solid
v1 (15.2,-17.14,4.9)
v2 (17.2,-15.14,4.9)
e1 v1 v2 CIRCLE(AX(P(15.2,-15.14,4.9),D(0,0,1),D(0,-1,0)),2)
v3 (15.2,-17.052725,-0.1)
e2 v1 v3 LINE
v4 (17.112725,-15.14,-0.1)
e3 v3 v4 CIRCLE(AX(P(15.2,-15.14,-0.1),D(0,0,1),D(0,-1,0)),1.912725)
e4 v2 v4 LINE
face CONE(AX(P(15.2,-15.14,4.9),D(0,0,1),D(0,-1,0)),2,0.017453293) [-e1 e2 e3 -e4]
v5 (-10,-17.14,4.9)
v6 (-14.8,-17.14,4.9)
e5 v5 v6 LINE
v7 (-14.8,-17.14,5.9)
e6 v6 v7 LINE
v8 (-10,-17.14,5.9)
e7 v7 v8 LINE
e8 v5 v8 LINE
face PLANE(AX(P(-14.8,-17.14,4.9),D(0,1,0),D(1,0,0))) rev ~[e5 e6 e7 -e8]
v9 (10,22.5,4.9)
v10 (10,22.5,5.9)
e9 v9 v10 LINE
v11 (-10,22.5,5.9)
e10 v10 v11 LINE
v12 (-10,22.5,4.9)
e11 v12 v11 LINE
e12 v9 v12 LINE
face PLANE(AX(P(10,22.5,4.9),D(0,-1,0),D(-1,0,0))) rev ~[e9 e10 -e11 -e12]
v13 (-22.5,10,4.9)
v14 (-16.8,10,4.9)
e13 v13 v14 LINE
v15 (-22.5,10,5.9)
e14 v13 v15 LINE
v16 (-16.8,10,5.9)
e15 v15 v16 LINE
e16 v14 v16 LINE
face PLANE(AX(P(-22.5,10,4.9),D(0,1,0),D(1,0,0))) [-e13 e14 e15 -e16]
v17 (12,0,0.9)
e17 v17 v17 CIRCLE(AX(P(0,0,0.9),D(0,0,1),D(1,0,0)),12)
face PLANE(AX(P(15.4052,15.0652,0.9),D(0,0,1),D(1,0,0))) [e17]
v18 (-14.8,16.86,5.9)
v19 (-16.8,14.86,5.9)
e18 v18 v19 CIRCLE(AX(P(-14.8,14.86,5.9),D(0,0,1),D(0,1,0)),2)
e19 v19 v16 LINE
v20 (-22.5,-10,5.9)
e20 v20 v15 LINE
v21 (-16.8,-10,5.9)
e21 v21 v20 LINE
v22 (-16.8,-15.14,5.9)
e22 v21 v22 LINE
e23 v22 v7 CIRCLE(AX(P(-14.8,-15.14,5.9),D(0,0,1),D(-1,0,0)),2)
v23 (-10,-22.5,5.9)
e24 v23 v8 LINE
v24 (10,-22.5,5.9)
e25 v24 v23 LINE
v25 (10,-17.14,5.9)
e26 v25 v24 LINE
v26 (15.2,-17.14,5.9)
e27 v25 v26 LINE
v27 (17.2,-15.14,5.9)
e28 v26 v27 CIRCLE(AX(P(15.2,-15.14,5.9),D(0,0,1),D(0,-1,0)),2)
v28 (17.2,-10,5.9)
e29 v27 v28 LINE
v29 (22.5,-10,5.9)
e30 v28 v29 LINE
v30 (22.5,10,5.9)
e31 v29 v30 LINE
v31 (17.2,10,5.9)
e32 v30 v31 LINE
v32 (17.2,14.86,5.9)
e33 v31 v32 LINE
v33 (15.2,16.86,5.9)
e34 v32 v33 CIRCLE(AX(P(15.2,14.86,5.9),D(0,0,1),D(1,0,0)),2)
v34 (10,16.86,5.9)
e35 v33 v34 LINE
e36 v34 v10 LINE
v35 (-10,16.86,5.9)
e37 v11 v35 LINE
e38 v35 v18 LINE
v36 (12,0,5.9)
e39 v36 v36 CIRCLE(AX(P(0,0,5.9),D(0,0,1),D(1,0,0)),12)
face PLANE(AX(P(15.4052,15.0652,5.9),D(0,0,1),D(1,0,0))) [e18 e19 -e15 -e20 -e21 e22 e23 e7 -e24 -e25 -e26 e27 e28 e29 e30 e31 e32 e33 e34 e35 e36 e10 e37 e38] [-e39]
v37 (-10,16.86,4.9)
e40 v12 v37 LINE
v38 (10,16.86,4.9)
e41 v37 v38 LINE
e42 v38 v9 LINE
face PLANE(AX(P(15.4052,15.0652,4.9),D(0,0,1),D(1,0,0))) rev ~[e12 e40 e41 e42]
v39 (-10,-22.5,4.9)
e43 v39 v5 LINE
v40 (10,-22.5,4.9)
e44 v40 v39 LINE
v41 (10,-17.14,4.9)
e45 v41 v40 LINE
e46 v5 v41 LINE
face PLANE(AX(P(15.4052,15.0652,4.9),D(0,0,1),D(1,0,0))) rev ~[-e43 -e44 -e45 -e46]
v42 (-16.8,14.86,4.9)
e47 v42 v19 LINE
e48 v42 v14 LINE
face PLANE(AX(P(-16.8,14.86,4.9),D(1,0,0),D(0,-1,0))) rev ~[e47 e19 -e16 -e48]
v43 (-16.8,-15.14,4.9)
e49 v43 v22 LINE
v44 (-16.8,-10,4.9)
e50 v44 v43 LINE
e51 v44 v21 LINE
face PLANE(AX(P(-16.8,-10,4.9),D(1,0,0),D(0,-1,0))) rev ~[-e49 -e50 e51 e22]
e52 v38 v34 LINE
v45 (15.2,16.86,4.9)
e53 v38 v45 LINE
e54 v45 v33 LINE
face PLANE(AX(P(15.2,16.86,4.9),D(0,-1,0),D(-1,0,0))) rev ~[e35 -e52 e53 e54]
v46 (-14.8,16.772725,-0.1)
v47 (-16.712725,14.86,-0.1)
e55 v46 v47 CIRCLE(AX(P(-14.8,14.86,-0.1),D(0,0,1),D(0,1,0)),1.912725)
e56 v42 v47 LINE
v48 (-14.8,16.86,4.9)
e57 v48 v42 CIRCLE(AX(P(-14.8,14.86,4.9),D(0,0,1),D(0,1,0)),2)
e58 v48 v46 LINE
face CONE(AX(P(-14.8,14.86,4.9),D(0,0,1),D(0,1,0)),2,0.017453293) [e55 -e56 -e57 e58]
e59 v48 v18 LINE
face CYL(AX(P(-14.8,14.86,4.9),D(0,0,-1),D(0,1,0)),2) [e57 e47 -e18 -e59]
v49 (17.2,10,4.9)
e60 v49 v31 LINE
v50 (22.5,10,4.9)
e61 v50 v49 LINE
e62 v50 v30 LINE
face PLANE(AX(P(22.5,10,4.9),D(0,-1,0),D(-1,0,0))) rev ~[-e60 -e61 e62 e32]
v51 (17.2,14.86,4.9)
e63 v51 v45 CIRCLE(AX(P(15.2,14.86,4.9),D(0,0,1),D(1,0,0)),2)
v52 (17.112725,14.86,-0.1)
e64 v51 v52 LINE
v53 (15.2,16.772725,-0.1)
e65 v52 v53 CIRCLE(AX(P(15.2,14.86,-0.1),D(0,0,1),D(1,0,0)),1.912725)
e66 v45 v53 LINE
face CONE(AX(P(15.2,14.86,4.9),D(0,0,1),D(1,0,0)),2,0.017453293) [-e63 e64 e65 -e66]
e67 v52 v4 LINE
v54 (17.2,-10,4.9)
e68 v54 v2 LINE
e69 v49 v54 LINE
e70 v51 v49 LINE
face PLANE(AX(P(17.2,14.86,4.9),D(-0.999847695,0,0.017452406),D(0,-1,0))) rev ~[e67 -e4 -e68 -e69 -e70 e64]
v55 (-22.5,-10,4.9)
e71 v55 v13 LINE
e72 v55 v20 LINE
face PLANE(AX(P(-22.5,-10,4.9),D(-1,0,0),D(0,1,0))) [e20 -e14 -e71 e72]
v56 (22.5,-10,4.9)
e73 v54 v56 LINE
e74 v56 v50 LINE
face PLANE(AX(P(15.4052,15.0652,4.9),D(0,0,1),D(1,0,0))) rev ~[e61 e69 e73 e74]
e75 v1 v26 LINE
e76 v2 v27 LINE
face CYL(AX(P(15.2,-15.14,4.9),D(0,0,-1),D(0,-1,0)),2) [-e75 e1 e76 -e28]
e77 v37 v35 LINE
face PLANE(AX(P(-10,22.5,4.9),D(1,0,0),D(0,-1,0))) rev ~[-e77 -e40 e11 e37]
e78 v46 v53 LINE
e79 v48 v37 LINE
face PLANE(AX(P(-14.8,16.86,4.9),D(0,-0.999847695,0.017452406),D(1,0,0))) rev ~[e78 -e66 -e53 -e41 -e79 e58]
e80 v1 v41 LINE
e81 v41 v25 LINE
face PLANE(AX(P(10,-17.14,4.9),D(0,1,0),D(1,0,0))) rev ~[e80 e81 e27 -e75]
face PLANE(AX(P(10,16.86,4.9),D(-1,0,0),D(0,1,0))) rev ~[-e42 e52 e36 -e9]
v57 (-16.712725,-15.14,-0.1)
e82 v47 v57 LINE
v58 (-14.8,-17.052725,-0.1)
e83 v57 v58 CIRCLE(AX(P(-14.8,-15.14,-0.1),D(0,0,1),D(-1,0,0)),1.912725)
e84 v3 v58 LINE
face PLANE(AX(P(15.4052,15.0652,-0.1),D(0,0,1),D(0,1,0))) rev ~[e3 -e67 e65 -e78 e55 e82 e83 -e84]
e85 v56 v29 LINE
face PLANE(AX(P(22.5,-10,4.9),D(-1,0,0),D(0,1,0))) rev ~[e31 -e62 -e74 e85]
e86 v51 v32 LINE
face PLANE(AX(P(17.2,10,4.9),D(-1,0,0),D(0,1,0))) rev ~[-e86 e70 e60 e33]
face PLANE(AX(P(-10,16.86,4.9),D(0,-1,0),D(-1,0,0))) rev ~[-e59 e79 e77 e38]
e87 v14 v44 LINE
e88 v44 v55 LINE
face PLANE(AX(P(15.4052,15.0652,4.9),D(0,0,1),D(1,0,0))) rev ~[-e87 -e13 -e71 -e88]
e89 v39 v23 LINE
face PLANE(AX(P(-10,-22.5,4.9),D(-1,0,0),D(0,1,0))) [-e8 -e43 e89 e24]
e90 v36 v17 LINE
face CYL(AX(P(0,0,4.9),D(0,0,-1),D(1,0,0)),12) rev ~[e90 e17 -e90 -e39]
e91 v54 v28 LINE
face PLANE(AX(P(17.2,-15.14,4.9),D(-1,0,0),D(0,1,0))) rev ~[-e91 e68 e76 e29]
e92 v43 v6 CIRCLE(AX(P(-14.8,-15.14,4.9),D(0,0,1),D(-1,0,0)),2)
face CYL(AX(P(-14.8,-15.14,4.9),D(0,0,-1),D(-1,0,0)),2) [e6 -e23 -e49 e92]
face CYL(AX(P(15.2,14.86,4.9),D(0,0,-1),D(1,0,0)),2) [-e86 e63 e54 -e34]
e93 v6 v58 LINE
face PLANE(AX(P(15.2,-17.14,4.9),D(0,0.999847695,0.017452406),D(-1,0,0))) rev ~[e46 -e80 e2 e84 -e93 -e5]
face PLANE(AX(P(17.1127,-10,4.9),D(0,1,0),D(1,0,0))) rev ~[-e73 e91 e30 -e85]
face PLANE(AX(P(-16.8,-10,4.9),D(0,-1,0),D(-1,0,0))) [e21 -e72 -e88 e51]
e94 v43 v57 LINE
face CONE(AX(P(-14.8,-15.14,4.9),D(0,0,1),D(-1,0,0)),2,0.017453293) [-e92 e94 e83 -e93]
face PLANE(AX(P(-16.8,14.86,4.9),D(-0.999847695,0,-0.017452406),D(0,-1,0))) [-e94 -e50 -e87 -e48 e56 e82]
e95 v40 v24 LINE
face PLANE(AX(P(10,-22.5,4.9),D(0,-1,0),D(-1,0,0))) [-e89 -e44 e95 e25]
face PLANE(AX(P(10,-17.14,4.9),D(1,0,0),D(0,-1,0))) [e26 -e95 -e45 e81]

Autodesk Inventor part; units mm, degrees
ref_plane "YZ Plane" through (0, 0, 0) normal (1, 0, 0) x (0, 1, 0)
ref_plane "XZ Plane" through (0, 0, 0) normal (0, 1, 0) x (-1, 0, 0)
ref_plane "XY Plane" through (0, 0, 0) normal (0, 0, 1) x (1, 0, 0)
ref_plane "Work Plane1" through (15.4052, 15.0652, 4.9) normal (0, 0, 1) x (0, 1, 0)
sketch "Sketch1" plane through (15.4052, 15.0652, 4.9) normal (0, 0, 1) x (0, 1, 0)
  circle A0 centre (5.7948, 15.4052) radius 2.5 projected
  circle A1 centre (-15.6052, -5.7948) radius 2.5 projected
  line L0 (-20.0856, 39.0762) -> (-20.0856, 40.2052) projected
  line L1 (-20.0856, 40.2052) -> (-38.2052, 40.2052) projected
  arc A2 (-38.2052, 40.2052) -> (-40.2052, 38.2052) centre (-38.2052, 38.2052) ccw projected
  line L2 (-40.2052, 20.2953) -> (-40.2052, 38.2052) projected
  line L3 (-40.2052, 20.2953) -> (-39.0783, 20.2953) projected
  arc A3 (-39.0783, 20.2953) -> (-38.6768, 20.6232) centre (-39.0783, 20.7051) ccw projected
  arc A4 (-34.5391, 20.2052) -> (-38.6768, 20.6232) centre (-36.6291, 20.2052) ccw projected
  line L4 (-34.5391, 20.2052) -> (-34.5391, 10.4067) projected
  arc A5 (-38.647, 9.8643) -> (-34.5391, 10.4067) centre (-36.6023, 10.2052) ccw projected
  line L5 (-38.647, 9.8643) -> (-38.6775, 9.9849) projected
  arc A6 (-38.6775, 9.9849) -> (-39.0762, 10.3249) centre (-39.083, 9.9131) ccw projected
  line L6 (-39.0762, 10.3249) -> (-40.2052, 10.3249) projected
  line L7 (-40.2052, -7.7948) -> (-40.2052, 10.3249) projected
  arc A7 (-40.2052, -7.7948) -> (-38.2052, -9.7948) centre (-38.2052, -7.7948) ccw projected
  line L8 (-38.2052, -9.7948) -> (-20.2052, -9.7948) projected
  line L9 (-20.2052, -9.7948) -> (-20.2052, -10.8453) projected
  arc A8 (-20.6052, -11.3352) -> (-20.2052, -10.8453) centre (-20.7052, -10.8453) ccw projected
  arc A9 (-20.6052, -11.3352) -> (-20.2052, -15.2948) centre (-20.2052, -13.2948) ccw projected
  line L10 (-20.2052, -15.2948) -> (-10.2052, -15.2948) projected
  arc A10 (-10.2052, -15.2948) -> (-9.8052, -11.3352) centre (-10.2052, -13.2948) ccw projected
  arc A11 (-10.2052, -10.8453) -> (-9.8052, -11.3352) centre (-9.7052, -10.8453) ccw projected
  line L11 (-10.2052, -10.8453) -> (-10.2052, -9.7948) projected
  line L12 (-10.2052, -9.7948) -> (7.7948, -9.7948) projected
  arc A12 (7.7948, -9.7948) -> (9.7948, -7.7948) centre (7.7948, -7.7948) ccw projected
  line L13 (9.7948, 10.2052) -> (9.7948, -7.7948) projected
  line L14 (9.7948, 10.2052) -> (10.8453, 10.2052) projected
  arc A13 (11.3352, 9.8052) -> (10.8453, 10.2052) centre (10.8453, 9.7052) ccw projected
  arc A14 (11.3352, 9.8052) -> (15.2948, 10.2052) centre (13.2948, 10.2052) ccw projected
  line L15 (15.2948, 10.2052) -> (15.2948, 20.2052) projected
  arc A15 (15.2948, 20.2052) -> (11.3352, 20.6052) centre (13.2948, 20.2052) ccw projected
  arc A16 (10.8453, 20.2052) -> (11.3352, 20.6052) centre (10.8453, 20.7052) ccw projected
  line L16 (10.8453, 20.2052) -> (9.7948, 20.2052) projected
  line L17 (9.7948, 38.2052) -> (9.7948, 20.2052) projected
  arc A17 (9.7948, 38.2052) -> (7.7948, 40.2052) centre (7.7948, 38.2052) ccw projected
  line L18 (7.7948, 40.2052) -> (-10.1151, 40.2052) projected
  line L19 (-10.1151, 40.2052) -> (-10.1151, 39.0783) projected
  arc A18 (-10.1151, 39.0783) -> (-9.7873, 38.6768) centre (-9.7054, 39.0783) ccw projected
  arc A19 (-10.2052, 34.5391) -> (-9.7873, 38.6768) centre (-10.2052, 36.6291) ccw projected
  line L20 (-10.2052, 34.5391) -> (-20.0038, 34.5391) projected
  arc A20 (-20.5462, 38.647) -> (-20.0038, 34.5391) centre (-20.2052, 36.6023) ccw projected
  line L21 (-20.5462, 38.647) -> (-20.4256, 38.6775) projected
  arc A21 (-20.4256, 38.6775) -> (-20.0856, 39.0762) centre (-20.4974, 39.083) ccw projected
  line L22 (-0.2052, 32.2052) -> (-30.2052, 32.2052) projected
  arc A22 (1.7948, 30.2052) -> (-0.2052, 32.2052) centre (-0.2052, 30.2052) ccw projected
  line L23 (1.7948, 30.2052) -> (1.7948, 0.2052) projected
  arc A23 (-0.2052, -1.7948) -> (1.7948, 0.2052) centre (-0.2052, 0.2052) ccw projected
  line L24 (-0.2052, -1.7948) -> (-30.2052, -1.7948) projected
  arc A24 (-32.2052, 0.2052) -> (-30.2052, -1.7948) centre (-30.2052, 0.2052) ccw projected
  line L25 (-32.2052, 0.2052) -> (-32.2052, 30.2052) projected
  arc A25 (-30.2052, 32.2052) -> (-32.2052, 30.2052) centre (-30.2052, 30.2052) ccw projected
  circle A26 centre (-35.2052, 35.2052) radius 2.425 projected
  circle A27 centre (-29.7052, 36.0052) radius 2.65 projected
  circle A28 centre (-36.0052, 29.7052) radius 2.65 projected
  circle A29 centre (-35.2052, -4.7948) radius 2.425 projected
  circle A30 centre (-29.7052, -5.5948) radius 2.65 projected
  circle A31 centre (-36.0052, 0.7052) radius 2.65 projected
  circle A32 centre (4.7948, 35.2052) radius 2.425 projected
  circle A33 centre (-0.7052, 36.0052) radius 2.65 projected
  circle A34 centre (5.5948, 29.7052) radius 2.65 projected
  circle A35 centre (5.5948, 0.7052) radius 2.65 projected
  circle A36 centre (-0.7052, -5.5948) radius 2.65 projected
  circle A37 centre (4.7948, -4.7948) radius 2.425 projected
  point P0 (-15.0652, 15.4052)
extrude "Extrusion1" add sketch "Sketch1" against normal blind 5 draft -1 contours A22 L23 A23 L24 A24 L25 A25 L22
sketch "Sketch2" plane through (15.4052, 15.0652, 4.9) normal (0, 0, 1) x (1, 0, 0)
  circle A0 centre (-26.2552, -7.0652) radius 3 projected
  circle A1 centre (-26.2552, -23.0652) radius 3 projected
  circle A2 centre (-4.2552, -15.0652) radius 1.6 projected
  line L0 (-50.1952, -15.0652) -> (19.3848, -15.0652)
  circle A3 centre (-15.4052, -15.0652) radius 12
  dimension "d4" = 24
extrude "Extrusion2" cut sketch "Sketch2" against normal blind 4 contours A0 A3 | A0 A3 A2 L0 | A3 L0 A2 | L0 A2 A3 A1 | L0 A3 A2 | A1 A3 picked at (-24.6691, -8.292) picked at (-4.1694, -14.672) picked at (-4.1694, -15.4584) picked at (-24.6691, -21.8384)
sketch "Sketch4" plane through (15.4052, 15.0652, 4.9) normal (0, 0, 1) x (1, 0, 0)
  circle A0 centre (-15.4052, -15.0652) radius 12 construction
  line L0 (-32.2052, -0.2052) -> (-32.2052, -30.2052) construction
  arc A1 (-32.2052, -30.2052) -> (-30.2052, -32.2052) centre (-30.2052, -30.2052) ccw construction
  line L1 (-30.2052, -32.2052) -> (-0.2052, -32.2052) construction
  arc A2 (-0.2052, -32.2052) -> (1.7948, -30.2052) centre (-0.2052, -30.2052) ccw construction
  line L2 (1.7948, -30.2052) -> (1.7948, -0.2052) construction
  arc A3 (1.7948, -0.2052) -> (-0.2052, 1.7948) centre (-0.2052, -0.2052) ccw construction
  line L3 (-0.2052, 1.7948) -> (-30.2052, 1.7948) construction
  arc A4 (-30.2052, 1.7948) -> (-32.2052, -0.2052) centre (-30.2052, -0.2052) ccw construction
  line L4 (-37.9052, -25.0652) -> (7.0948, -25.0652) construction
  line L5 (7.0948, -25.0652) -> (7.0948, -5.0652) construction
  line L6 (7.0948, -5.0652) -> (-37.9052, -5.0652) construction
  line L7 (-37.9052, -5.0652) -> (-37.9052, -25.0652) construction
  line L8 (-37.9052, -25.0652) -> (7.0948, -5.0652) construction
  line L9 (7.0948, -25.0652) -> (-37.9052, -5.0652) construction
  line L10 (-25.4052, 7.4348) -> (-5.4052, 7.4348) construction
  line L11 (-5.4052, 7.4348) -> (-5.4052, -37.5652) construction
  line L12 (-5.4052, -37.5652) -> (-25.4052, -37.5652) construction
  line L13 (-25.4052, -37.5652) -> (-25.4052, 7.4348) construction
  line L14 (-25.4052, 7.4348) -> (-5.4052, -37.5652) construction
  line L15 (-5.4052, 7.4348) -> (-25.4052, -37.5652) construction
  line L16 (1.7075, -30.2052) -> (1.7075, -0.2052) construction
  line L17 (-30.2052, -32.2052) -> (-0.2052, -32.2052) construction
  line L18 (-32.118, -0.2052) -> (-32.118, -30.2052) construction
  line L19 (-0.2052, 1.7948) -> (-30.2052, 1.7948) construction
  line L20 (7.0948, -5.0652) -> (1.7075, -5.0652)
  line L21 (1.7075, -5.0652) -> (1.7075, -25.0652)
  line L22 (1.7075, -25.0652) -> (7.0948, -25.0652)
  line L23 (7.0948, -25.0652) -> (7.0948, -5.0652)
  line L24 (-5.4052, -37.5652) -> (-25.4052, -37.5652)
  line L25 (-25.4052, -37.5652) -> (-25.4052, -32.2052)
  line L26 (-25.4052, -32.2052) -> (-5.4052, -32.2052)
  line L27 (-5.4052, -32.2052) -> (-5.4052, -37.5652)
  line L28 (-32.2052, -25.0652) -> (-37.9052, -25.0652)
  line L29 (-37.9052, -25.0652) -> (-37.9052, -5.0652)
  line L30 (-37.9052, -5.0652) -> (-32.2052, -5.0652)
  line L31 (-32.2052, -5.0652) -> (-32.2052, -25.0652)
  line L32 (-25.4052, 1.7948) -> (-5.4052, 1.7948)
  line L33 (-5.4052, 1.7948) -> (-5.4052, 7.4348)
  line L34 (-5.4052, 7.4348) -> (-25.4052, 7.4348)
  line L35 (-25.4052, 7.4348) -> (-25.4052, 1.7948)
  point P0 (1.7948, -5.0652)
  point P1 (-5.4052, -32.2052)
  point P2 (-32.118, -5.0652)
  point P3 (-5.4052, 1.7948)
  dimension "d7" = 45
  dimension "d8" = 20
  dimension "d9" = 20
  dimension "d10" = 45
extrude "Extrusion4" add sketch "Sketch4" along normal blind 1
sketch "Sketch5" plane through (15.4052, 15.0652, 4.9) normal (0, 0, 1) x (1, 0, 0)
  line L0 (1.7075, -5.0652) -> (1.7948, -5.0652) projected
  line L1 (1.7948, -5.0652) -> (1.7948, -0.2052) projected
  arc A0 (1.7948, -0.2052) -> (-0.2052, 1.7948) centre (-0.2052, -0.2052) ccw projected
  line L2 (-0.2052, 1.7948) -> (-5.4052, 1.7948) projected
  line L3 (-5.4052, 1.7948) -> (-25.4052, 1.7948) projected
  line L4 (-25.4052, 1.7948) -> (-30.2052, 1.7948) projected
  arc A1 (-30.2052, 1.7948) -> (-32.2052, -0.2052) centre (-30.2052, -0.2052) ccw projected
  line L5 (-32.2052, -0.2052) -> (-32.2052, -5.0652) projected
  line L6 (-32.2052, -5.0652) -> (-32.2052, -25.0652) projected
  line L7 (-32.2052, -25.0652) -> (-32.2052, -30.2052) projected
  arc A2 (-32.2052, -30.2052) -> (-30.2052, -32.2052) centre (-30.2052, -30.2052) ccw projected
  line L8 (-30.2052, -32.2052) -> (-25.4052, -32.2052) projected
  line L9 (-25.4052, -32.2052) -> (-5.4052, -32.2052) projected
  line L10 (-5.4052, -32.2052) -> (-0.2052, -32.2052) projected
  arc A3 (-0.2052, -32.2052) -> (1.7948, -30.2052) centre (-0.2052, -30.2052) ccw projected
  line L11 (1.7948, -30.2052) -> (1.7948, -25.0652) projected
  line L12 (1.7948, -25.0652) -> (1.7075, -25.0652) projected
  line L13 (1.7075, -25.0652) -> (1.7075, -5.0652) projected
  circle A4 centre (-15.4052, -15.0652) radius 12 projected
extrude "Extrusion5" add sketch "Sketch5" along normal blind 1
properties part number "30_Cube_counterplate_LEDmount"
